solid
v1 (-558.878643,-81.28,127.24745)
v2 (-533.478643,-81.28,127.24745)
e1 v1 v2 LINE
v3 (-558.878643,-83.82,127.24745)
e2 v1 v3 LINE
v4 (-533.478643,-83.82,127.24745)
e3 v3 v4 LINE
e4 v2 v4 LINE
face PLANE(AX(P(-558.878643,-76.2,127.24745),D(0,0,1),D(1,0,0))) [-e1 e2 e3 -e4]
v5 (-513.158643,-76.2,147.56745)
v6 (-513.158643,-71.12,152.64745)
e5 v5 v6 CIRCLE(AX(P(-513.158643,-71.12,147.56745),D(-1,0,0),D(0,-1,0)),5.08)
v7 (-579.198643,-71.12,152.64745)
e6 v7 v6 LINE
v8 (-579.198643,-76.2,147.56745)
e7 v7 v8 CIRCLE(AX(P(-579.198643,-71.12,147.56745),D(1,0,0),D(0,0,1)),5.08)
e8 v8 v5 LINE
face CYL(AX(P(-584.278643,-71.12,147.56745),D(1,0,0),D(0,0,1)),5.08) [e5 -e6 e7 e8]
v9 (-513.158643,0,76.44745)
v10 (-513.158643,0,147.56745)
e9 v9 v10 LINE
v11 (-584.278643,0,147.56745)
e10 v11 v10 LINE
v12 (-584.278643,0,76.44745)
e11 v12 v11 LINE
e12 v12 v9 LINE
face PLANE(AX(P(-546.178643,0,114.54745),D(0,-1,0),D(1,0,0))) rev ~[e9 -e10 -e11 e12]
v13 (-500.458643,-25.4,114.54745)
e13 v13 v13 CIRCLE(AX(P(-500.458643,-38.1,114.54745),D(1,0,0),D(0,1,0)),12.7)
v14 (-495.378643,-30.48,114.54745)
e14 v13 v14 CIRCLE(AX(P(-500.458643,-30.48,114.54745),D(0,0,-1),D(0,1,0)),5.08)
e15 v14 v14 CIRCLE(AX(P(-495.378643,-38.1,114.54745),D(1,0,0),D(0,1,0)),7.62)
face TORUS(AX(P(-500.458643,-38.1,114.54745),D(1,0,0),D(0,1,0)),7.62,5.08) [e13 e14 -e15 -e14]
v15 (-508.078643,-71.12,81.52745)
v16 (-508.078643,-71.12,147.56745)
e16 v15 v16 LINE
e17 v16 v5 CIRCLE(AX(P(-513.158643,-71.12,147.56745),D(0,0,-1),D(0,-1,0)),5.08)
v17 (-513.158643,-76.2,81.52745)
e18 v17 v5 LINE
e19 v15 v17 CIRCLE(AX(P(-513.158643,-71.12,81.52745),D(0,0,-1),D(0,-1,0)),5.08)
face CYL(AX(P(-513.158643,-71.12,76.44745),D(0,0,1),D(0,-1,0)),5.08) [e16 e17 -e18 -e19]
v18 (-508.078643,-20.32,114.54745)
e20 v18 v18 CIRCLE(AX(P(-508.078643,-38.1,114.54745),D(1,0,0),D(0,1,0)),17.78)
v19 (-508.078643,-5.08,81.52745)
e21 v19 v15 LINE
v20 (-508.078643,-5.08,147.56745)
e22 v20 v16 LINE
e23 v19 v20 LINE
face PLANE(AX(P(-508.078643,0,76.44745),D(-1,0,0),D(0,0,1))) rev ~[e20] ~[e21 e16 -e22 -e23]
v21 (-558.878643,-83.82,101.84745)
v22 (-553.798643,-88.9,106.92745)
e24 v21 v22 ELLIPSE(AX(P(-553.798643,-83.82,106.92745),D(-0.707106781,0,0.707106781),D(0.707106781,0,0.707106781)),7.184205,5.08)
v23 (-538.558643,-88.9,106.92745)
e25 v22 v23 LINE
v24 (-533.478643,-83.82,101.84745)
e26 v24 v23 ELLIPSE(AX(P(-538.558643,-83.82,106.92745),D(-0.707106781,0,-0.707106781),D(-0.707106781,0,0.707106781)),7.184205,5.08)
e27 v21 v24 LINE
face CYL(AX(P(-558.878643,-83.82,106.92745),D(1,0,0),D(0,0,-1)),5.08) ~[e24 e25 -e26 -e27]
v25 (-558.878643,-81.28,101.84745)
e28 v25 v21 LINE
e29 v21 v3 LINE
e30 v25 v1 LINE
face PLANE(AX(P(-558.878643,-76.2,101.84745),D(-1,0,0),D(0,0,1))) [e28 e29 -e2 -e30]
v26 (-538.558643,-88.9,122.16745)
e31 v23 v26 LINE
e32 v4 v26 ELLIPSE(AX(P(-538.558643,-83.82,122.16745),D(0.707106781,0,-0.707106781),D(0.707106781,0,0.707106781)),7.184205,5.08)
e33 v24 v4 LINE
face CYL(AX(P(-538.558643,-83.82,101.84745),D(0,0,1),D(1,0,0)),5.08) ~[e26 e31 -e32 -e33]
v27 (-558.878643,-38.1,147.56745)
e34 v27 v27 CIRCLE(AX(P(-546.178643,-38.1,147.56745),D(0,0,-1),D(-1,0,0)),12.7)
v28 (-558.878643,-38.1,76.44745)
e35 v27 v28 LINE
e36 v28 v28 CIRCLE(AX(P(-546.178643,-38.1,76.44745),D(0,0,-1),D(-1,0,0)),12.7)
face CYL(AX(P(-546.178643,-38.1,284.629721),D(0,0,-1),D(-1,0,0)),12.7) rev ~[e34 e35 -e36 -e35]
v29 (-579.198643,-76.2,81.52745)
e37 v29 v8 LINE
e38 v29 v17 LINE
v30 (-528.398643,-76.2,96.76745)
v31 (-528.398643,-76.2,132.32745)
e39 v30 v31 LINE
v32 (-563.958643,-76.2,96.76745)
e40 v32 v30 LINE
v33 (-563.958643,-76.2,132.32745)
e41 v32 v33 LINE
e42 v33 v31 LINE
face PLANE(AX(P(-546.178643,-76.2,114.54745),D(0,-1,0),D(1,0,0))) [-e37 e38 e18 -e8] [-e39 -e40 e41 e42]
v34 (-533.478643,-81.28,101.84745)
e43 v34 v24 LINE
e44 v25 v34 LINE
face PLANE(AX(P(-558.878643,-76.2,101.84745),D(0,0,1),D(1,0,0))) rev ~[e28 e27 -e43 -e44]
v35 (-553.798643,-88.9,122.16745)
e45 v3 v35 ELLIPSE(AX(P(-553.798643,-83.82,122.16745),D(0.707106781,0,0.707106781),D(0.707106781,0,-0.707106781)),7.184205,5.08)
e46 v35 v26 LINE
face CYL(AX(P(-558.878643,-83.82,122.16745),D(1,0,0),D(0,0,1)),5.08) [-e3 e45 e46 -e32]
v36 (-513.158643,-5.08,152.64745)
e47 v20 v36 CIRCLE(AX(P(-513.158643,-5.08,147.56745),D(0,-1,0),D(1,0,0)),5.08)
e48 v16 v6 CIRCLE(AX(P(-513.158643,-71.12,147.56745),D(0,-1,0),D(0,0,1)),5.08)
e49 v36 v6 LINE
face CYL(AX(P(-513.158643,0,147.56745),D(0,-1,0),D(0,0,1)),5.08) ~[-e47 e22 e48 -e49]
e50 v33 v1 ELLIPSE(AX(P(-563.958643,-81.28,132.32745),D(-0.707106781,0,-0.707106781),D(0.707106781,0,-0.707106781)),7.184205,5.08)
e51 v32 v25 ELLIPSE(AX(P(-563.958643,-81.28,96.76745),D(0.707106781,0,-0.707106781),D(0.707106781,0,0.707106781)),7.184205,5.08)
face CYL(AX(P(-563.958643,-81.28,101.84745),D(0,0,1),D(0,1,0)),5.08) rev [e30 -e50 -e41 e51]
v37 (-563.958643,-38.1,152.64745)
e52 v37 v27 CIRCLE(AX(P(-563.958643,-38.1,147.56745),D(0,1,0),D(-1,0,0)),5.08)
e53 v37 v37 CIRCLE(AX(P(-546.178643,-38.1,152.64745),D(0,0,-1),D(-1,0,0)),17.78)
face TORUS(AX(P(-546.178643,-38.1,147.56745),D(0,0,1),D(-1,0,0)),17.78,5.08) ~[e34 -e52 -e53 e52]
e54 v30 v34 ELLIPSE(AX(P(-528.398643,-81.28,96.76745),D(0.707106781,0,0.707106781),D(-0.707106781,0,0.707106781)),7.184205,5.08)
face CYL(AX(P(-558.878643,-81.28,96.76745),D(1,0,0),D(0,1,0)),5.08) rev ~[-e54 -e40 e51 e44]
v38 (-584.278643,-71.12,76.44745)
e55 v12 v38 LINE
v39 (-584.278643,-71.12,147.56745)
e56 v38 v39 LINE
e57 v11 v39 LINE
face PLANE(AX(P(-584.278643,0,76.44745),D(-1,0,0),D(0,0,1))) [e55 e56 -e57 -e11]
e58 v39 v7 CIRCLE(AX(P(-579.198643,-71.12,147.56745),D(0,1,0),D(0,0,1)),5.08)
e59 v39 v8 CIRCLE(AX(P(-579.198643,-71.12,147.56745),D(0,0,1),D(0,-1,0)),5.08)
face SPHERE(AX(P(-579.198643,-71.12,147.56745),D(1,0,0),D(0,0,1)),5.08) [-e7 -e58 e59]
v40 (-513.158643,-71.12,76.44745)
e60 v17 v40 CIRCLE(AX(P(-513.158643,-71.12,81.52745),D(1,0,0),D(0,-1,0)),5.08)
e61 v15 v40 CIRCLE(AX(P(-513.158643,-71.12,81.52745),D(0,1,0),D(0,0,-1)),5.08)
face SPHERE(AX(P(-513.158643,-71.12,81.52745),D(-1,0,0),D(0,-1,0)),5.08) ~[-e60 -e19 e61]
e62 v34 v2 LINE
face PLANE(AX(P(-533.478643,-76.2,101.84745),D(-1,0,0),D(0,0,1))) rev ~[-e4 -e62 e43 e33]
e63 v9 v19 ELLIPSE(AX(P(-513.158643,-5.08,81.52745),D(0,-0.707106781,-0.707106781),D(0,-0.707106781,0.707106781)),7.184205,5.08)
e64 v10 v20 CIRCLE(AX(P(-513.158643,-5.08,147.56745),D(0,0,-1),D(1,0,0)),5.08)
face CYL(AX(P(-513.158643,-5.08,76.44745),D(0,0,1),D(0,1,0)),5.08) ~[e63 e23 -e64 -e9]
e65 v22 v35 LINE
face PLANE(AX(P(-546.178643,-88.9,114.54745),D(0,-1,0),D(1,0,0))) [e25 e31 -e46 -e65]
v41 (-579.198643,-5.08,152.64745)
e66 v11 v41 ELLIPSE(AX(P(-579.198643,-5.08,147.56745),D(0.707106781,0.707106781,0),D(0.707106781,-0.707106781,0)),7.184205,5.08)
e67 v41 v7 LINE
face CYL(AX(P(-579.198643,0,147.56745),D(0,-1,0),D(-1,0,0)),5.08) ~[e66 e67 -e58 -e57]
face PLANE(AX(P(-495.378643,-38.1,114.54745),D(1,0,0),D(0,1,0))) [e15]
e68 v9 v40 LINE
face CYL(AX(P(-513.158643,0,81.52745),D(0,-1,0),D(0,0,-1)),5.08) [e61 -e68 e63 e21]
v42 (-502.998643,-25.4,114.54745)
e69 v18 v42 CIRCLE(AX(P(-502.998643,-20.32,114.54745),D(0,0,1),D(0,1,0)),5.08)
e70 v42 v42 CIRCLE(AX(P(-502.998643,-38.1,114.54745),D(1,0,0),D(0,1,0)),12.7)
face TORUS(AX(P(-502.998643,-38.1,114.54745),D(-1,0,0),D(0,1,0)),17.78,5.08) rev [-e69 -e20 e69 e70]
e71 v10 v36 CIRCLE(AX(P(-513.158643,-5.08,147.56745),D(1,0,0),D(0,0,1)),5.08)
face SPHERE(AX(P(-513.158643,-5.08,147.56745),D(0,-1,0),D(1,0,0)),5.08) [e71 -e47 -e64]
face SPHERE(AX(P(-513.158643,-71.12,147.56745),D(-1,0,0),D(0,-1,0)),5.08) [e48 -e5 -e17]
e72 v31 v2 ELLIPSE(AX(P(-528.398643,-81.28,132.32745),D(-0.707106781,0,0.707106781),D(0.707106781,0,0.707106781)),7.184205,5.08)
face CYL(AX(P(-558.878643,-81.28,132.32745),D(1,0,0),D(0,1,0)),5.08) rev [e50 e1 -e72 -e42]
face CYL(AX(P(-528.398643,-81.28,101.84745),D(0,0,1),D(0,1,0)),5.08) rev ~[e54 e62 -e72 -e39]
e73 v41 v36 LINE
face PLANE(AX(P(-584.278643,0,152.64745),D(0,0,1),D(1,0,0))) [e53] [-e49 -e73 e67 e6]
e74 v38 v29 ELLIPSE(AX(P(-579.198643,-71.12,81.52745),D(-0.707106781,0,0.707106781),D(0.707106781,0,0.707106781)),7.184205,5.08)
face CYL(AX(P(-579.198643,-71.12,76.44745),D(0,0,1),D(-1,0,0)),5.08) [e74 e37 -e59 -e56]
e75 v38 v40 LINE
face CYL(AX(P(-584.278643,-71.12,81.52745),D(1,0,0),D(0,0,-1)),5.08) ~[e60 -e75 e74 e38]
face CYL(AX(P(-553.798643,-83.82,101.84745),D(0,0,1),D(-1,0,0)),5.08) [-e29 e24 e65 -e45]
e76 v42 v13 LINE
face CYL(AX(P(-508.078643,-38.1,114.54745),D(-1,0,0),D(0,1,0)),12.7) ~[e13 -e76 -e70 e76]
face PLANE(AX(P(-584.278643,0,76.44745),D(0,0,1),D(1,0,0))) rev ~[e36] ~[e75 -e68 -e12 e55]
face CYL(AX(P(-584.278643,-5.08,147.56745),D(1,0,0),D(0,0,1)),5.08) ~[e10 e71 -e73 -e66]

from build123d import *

# Parameters (mm, degrees)
F0_W     = 76.2
F0_H     = 76.2
F1_DEPTH = 76.2
F3_D     = 25.4
F4_W     = 25.4
F4_H     = 25.4
F5_DEPTH = 12.7
F6_R     = 12.7
F7_DEPTH = 12.7
F8_R     = 5.08


with BuildPart() as f1:
    # F0 (on Front) → F1 (new body)
    with BuildSketch(Plane.XZ):
        with Locations((-546.1786431313, 114.5474496245)):
            Rectangle(F0_W, F0_H)
    extrude(amount=F1_DEPTH)

    # F3 (through all)
    with Locations(Plane.XY.offset(152.6474496245)):
        with Locations((-546.1786431313, -38.1)):
            Hole(F3_D / 2)

    # F4 (on face) → F5 (join)
    with BuildSketch(Plane.XZ.offset(76.2)):
        with Locations((-546.1786431313, 114.5474496245)):
            Rectangle(F4_W, F4_H)
    extrude(amount=F5_DEPTH)

    # F6 (on face) → F7 (join)
    with BuildSketch(Plane.YZ.offset(-508.0786431313)):
        with Locations((-38.1, 114.5474496245)):
            Circle(F6_R)
    extrude(amount=F7_DEPTH)

    # F8
    f8_edges = [f1.edges().sort_by_distance(p)[0] for p in [
        (-546.178643, -76.2, 152.64745),
        (-584.278643, -38.1, 152.64745),
        (-546.178643, -88.9, 127.24745),
        (-533.478643, -88.9, 114.54745),
        (-546.178643, -88.9, 101.84745),
        (-558.878643, -88.9, 114.54745),
        (-508.078643, -50.8, 114.54745),
        (-495.378643, -50.8, 114.54745),
        (-584.278643, -76.2, 114.54745),
        (-546.178643, -76.2, 76.44745),
        (-508.078643, -76.2, 114.54745),
        (-533.478643, -76.2, 114.54745),
        (-546.178643, -76.2, 127.24745),
        (-558.878643, -76.2, 114.54745),
        (-546.178643, -76.2, 101.84745),
        (-508.078643, -38.1, 152.64745),
        (-508.078643, 0, 114.54745),
        (-508.078643, -38.1, 76.44745),
        (-546.178643, 0, 152.64745),
        (-558.878643, -38.1, 152.64745),
    ]]
    fillet(f8_edges, radius=F8_R)


solid = f1.part
